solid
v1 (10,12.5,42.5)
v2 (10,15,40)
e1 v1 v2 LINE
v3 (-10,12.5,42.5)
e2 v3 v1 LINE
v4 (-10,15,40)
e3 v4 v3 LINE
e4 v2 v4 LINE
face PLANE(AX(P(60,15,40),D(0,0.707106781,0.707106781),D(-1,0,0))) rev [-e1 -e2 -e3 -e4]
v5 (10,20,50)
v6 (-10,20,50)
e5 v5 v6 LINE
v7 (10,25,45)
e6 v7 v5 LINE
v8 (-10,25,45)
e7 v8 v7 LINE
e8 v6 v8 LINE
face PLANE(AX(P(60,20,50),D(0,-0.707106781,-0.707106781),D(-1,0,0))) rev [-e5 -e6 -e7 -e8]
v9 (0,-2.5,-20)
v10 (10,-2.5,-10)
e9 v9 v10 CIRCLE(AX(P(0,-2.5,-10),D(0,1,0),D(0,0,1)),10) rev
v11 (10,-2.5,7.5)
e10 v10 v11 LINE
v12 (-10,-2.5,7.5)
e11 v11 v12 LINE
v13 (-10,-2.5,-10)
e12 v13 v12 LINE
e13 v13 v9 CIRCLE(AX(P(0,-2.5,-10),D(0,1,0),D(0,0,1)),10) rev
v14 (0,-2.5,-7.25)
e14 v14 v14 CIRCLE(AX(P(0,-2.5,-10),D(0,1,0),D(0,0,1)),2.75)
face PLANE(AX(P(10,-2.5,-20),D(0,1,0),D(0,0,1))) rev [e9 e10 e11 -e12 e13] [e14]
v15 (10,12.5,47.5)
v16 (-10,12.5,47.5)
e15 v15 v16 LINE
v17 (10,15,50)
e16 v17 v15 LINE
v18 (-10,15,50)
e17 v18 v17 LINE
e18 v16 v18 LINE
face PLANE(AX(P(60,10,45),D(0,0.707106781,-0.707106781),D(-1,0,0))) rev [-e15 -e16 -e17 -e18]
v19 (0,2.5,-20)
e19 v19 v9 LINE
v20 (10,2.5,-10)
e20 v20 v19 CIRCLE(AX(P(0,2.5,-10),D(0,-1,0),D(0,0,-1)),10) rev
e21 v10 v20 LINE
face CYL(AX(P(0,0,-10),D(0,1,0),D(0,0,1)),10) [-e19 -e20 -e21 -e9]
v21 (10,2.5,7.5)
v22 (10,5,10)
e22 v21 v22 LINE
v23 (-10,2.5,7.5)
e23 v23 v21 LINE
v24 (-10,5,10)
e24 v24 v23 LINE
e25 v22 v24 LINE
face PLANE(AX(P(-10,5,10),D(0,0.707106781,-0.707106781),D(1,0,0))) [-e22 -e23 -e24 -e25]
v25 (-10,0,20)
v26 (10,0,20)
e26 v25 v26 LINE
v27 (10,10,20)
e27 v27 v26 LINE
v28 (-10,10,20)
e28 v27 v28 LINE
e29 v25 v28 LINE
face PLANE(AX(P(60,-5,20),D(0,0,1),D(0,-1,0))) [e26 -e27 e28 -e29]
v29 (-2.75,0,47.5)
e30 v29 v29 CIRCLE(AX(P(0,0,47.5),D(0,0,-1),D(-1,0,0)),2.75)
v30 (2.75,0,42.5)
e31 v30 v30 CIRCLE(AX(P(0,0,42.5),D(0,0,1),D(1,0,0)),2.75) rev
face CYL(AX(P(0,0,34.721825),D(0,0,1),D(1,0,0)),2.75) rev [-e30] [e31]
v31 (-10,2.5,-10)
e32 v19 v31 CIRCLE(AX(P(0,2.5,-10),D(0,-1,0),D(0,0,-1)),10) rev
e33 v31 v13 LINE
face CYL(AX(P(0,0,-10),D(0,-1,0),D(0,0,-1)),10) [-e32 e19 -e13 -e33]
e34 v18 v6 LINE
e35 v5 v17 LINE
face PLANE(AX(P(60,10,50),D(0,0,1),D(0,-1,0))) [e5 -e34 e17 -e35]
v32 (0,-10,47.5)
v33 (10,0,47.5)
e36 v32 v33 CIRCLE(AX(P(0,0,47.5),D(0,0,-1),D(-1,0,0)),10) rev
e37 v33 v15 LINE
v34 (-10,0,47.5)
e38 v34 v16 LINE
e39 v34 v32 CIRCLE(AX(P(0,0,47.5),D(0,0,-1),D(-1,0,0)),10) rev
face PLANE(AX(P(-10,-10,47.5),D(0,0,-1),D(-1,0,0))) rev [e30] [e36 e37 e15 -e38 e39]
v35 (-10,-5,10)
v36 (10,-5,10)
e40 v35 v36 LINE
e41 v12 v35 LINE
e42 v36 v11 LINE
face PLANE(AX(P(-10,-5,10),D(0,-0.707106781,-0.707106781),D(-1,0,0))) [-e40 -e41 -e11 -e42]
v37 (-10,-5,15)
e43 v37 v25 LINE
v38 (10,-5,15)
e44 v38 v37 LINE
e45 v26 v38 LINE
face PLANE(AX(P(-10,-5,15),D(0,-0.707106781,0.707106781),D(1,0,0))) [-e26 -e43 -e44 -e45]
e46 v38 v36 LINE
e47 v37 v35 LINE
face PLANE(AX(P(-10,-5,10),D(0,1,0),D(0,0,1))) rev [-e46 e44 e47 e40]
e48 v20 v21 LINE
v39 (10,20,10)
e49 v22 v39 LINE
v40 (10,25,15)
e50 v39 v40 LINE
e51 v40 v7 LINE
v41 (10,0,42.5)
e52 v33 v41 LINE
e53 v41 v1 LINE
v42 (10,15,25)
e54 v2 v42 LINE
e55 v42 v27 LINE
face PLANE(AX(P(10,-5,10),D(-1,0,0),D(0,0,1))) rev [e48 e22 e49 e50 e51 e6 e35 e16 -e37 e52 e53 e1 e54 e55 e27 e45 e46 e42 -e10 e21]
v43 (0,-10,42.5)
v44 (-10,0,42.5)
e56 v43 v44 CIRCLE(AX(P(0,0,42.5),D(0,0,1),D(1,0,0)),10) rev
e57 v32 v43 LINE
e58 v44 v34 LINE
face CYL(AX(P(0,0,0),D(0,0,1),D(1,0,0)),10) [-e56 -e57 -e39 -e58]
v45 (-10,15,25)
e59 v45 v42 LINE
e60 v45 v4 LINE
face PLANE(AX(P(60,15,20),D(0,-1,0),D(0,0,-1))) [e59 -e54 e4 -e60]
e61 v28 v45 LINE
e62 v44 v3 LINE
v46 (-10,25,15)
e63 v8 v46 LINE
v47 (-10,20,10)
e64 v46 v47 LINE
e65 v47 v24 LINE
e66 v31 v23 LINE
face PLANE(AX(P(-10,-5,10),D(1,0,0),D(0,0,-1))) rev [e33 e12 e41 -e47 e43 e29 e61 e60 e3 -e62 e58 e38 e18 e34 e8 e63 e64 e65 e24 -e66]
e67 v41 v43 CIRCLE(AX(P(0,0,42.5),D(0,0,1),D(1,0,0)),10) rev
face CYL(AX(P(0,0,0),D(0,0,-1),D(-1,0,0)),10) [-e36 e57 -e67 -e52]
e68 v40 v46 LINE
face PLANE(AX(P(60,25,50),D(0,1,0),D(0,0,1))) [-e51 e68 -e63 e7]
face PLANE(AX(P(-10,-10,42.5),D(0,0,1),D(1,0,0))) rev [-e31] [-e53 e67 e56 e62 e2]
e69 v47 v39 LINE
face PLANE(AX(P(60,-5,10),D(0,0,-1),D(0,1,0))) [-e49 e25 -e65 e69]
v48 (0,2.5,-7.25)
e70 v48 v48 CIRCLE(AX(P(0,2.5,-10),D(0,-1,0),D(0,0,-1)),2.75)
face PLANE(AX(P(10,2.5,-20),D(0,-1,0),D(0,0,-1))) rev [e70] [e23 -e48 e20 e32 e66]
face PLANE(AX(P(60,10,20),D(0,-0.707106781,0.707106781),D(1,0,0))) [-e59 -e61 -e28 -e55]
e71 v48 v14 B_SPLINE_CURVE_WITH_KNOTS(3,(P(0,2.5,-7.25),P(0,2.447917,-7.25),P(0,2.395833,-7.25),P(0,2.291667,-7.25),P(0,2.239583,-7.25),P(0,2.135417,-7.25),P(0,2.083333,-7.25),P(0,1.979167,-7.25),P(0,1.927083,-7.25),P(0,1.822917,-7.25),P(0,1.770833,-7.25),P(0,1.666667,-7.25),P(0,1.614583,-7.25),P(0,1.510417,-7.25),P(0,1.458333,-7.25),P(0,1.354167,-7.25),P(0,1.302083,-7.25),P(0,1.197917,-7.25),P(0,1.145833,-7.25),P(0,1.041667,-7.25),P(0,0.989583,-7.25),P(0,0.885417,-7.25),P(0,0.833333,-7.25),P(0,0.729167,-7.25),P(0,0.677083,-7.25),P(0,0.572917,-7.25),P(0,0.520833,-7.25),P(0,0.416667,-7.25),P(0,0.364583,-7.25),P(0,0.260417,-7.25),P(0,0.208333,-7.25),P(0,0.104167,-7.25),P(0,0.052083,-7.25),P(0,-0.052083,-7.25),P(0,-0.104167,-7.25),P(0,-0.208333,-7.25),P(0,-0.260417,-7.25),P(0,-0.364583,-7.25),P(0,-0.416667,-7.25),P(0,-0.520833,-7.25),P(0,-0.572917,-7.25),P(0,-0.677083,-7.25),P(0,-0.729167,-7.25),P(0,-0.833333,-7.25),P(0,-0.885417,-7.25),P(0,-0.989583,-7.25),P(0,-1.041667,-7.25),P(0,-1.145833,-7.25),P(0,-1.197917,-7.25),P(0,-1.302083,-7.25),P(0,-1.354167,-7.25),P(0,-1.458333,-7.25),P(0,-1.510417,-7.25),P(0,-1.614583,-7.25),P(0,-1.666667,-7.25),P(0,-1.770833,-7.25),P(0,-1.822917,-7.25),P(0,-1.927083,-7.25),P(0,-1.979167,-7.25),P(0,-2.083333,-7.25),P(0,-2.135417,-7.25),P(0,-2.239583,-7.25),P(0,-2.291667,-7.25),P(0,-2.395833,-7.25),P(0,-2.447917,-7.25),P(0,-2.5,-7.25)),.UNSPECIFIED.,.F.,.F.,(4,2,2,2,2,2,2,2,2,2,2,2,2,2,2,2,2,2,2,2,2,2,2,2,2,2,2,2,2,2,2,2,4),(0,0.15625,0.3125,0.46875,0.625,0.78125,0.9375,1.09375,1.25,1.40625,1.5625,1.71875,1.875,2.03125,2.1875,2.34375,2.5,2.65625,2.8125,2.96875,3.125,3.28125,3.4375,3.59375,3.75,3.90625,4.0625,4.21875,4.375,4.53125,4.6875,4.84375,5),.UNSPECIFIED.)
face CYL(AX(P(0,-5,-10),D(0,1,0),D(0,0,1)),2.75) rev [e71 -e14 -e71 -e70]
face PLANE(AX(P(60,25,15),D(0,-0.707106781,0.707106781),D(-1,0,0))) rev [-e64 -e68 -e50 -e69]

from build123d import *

# Parameters (mm, degrees)
SKETCH1_W               = 20
SKETCH1_H               = 10
BOSS_EXTRUDE1_DEPTH     = 10
SKETCH3_W               = 20
SKETCH3_H               = 5
BOSS_EXTRUDE2_DEPTH     = 20
FILLET1_R               = 10
BOSS_EXTRUDE3_DEPTH     = 20
CUT_EXTRUDE1_DEPTH      = 56.733742024
CUT_EXTRUDE1_DEPTH_BACK = 56.733742024
SKETCH5_R               = 2.75
CHAMFER1_SIZE           = 10
SKETCH6_W               = 20
SKETCH6_H               = 5
BOSS_EXTRUDE4_DEPTH     = 20
FILLET2_R               = 10
CUT_EXTRUDE2_DEPTH      = 73.672209269
CUT_EXTRUDE2_DEPTH_BACK = 5
SKETCH7_R               = 2.75
CHAMFER2_SIZE           = 5
CHAMFER3_SIZE           = 5


# Some blends are built 0.0001 mm under size
with BuildPart() as part:
    # Sketch1 → Boss-Extrude1 (new body)
    with BuildSketch(Plane.XY):
        Rectangle(SKETCH1_W, SKETCH1_H)
    extrude(amount=BOSS_EXTRUDE1_DEPTH)

    # Sketch3 → Boss-Extrude2 (add)
    with BuildSketch(Plane(origin=(0, 0, 0), x_dir=(-1, 0, 0), z_dir=(0, 0, -1))):
        Rectangle(SKETCH3_W, SKETCH3_H)
    extrude(amount=BOSS_EXTRUDE2_DEPTH)

    # Fillet1
    fillet1_edges = [part.edges().sort_by_distance(p)[0] for p in [
        (-10, 0, -20),
        (10, 0, -20),
    ]]
    fillet(fillet1_edges, radius=FILLET1_R - 0.0001)  # a hair under: the kernel refuses the full size

    # Sketch4 → Boss-Extrude3 (add)
    with BuildSketch(Plane.ZY.offset(10)):
        Polygon((20, -5), (20, 15), (40, 15), (40, 10), (50, 10), (50, 25), (10, 25), (10, -5), align=None)
    extrude(amount=-BOSS_EXTRUDE3_DEPTH)

    # Sketch5 → Cut-Extrude1 (cut, two sides: drawn at the far end of the back side and taken through both)
    with BuildSketch(Plane(origin=(0, 2.5, 0), x_dir=(1, 0, 0), z_dir=(0, 1, 0)).offset(-CUT_EXTRUDE1_DEPTH_BACK)):
        with Locations(Location((0, 10, 0), (0, 0, 270))):
            Circle(SKETCH5_R)
    extrude(amount=CUT_EXTRUDE1_DEPTH + CUT_EXTRUDE1_DEPTH_BACK, mode=Mode.SUBTRACT)

    # Chamfer1
    # the kernel refuses this chamfer: 10 mm, written as the material it takes off along each edge
    with BuildSketch(Plane(origin=(35.71682988, 5, 0), x_dir=(0, -0.9996219169112968, -0.027495876610586372), z_dir=(-1, 0, 0))) as chamfer1_piece_1_section:
        Polygon((CHAMFER1_SIZE * 0.999621916911, CHAMFER1_SIZE * 0.0274958766106), (-CHAMFER1_SIZE * 0.0274958766106, CHAMFER1_SIZE * 0.999621916911), (0, 0), align=None)
    chamfer1_piece_1 = extrude(amount=71.433659759, mode=Mode.PRIVATE)
    chamfer1_piece_1 = split(chamfer1_piece_1, bisect_by=Plane(origin=(0, -2.5, 0.578931494), z_dir=(0, -1, 0)), keep=Keep.TOP, mode=Mode.PRIVATE)
    add(chamfer1_piece_1, mode=Mode.SUBTRACT)
    with BuildSketch(Plane(origin=(35.71682988, 5, 0), x_dir=(0, -0.9996219169112968, -0.027495876610586372), z_dir=(-1, 0, 0))) as chamfer1_piece_2_section:
        Polygon((CHAMFER1_SIZE * 0.999621916911, CHAMFER1_SIZE * 0.0274958766106), (-CHAMFER1_SIZE * 0.0274958766106, CHAMFER1_SIZE * 0.999621916911), (0, 0), align=None)
    chamfer1_piece_2 = extrude(amount=71.433659759, mode=Mode.PRIVATE)
    chamfer1_piece_2 = split(chamfer1_piece_2, bisect_by=Plane(origin=(0, 2.5, 4.466280687), z_dir=(0, 1, 0)), keep=Keep.TOP, mode=Mode.PRIVATE)
    chamfer1_piece_2 = split(chamfer1_piece_2, bisect_by=Plane(origin=(0, 3.939233337, 10), z_dir=(0, 0, -1)), keep=Keep.TOP, mode=Mode.PRIVATE)
    add(chamfer1_piece_2, mode=Mode.SUBTRACT)
    with BuildSketch(Plane(origin=(-35.71682988, -5, 0), x_dir=(0, -0.027495876610586403, 0.9996219169112968), z_dir=(1, 0, 0))) as chamfer1_piece_3_section:
        Polygon((CHAMFER1_SIZE * 0.999621916911, -CHAMFER1_SIZE * 0.0274958766106), (-CHAMFER1_SIZE * 0.0274958766106, -CHAMFER1_SIZE * 0.999621916911), (0, 0), align=None)
    chamfer1_piece_3 = extrude(amount=71.433659759, mode=Mode.PRIVATE)
    chamfer1_piece_3 = split(chamfer1_piece_3, bisect_by=Plane(origin=(0, -2.5, 4.487529346), z_dir=(0, -1, 0)), keep=Keep.TOP, mode=Mode.PRIVATE)
    add(chamfer1_piece_3, mode=Mode.SUBTRACT)
    with BuildSketch(Plane(origin=(-35.71682988, -5, 0), x_dir=(0, -0.027495876610586403, 0.9996219169112968), z_dir=(1, 0, 0))) as chamfer1_piece_4_section:
        Polygon((CHAMFER1_SIZE * 0.999621916911, -CHAMFER1_SIZE * 0.0274958766106), (-CHAMFER1_SIZE * 0.0274958766106, -CHAMFER1_SIZE * 0.999621916911), (0, 0), align=None)
    chamfer1_piece_4 = extrude(amount=71.433659759, mode=Mode.PRIVATE)
    chamfer1_piece_4 = split(chamfer1_piece_4, bisect_by=Plane(origin=(0, 2.5, 0.578931494), z_dir=(0, 1, 0)), keep=Keep.TOP, mode=Mode.PRIVATE)
    add(chamfer1_piece_4, mode=Mode.SUBTRACT)

    # Sketch6 → Boss-Extrude4 (add)
    with BuildSketch(Plane.XZ.offset(-10)):
        with Locations((0, 45)):
            Rectangle(SKETCH6_W, SKETCH6_H)
    extrude(amount=BOSS_EXTRUDE4_DEPTH)

    # Fillet2
    fillet2_edges = [part.edges().sort_by_distance(p)[0] for p in [
        (10, -10, 45),
        (-10, -10, 45),
    ]]
    fillet(fillet2_edges, radius=FILLET2_R - 0.0001)  # a hair under: the kernel refuses the full size

    # Sketch7 → Cut-Extrude2 (cut, two sides: drawn at the far end of the back side and taken through both)
    with BuildSketch(Plane.XY.offset(47.5).offset(-CUT_EXTRUDE2_DEPTH_BACK)):
        Circle(SKETCH7_R)
    extrude(amount=CUT_EXTRUDE2_DEPTH + CUT_EXTRUDE2_DEPTH_BACK, mode=Mode.SUBTRACT)

    # Chamfer2
    # the kernel refuses this chamfer: 5 mm, written as the material it takes off along each edge
    with BuildSketch(Plane(origin=(-22.85841494, 10, 40), x_dir=(0, -0.027495876610586317, 0.9996219169112968), z_dir=(1, 0, 0))) as chamfer2_piece_1_section:
        Polygon((CHAMFER2_SIZE * 0.999621916911, -CHAMFER2_SIZE * 0.0274958766106), (-CHAMFER2_SIZE * 0.0274958766106, -CHAMFER2_SIZE * 0.999621916911), (0, 0), align=None)
    chamfer2_piece_1 = extrude(amount=45.71682988, mode=Mode.PRIVATE)
    chamfer2_piece_1 = split(chamfer2_piece_1, bisect_by=Plane(origin=(0, 11.959930185, 42.5), z_dir=(0, 0, -1)), keep=Keep.TOP, mode=Mode.PRIVATE)
    chamfer2_piece_1 = split(chamfer2_piece_1, bisect_by=Plane(origin=(0, 15, 41.043890797), z_dir=(0, -1, 0)), keep=Keep.TOP, mode=Mode.PRIVATE)
    add(chamfer2_piece_1, mode=Mode.SUBTRACT)
    with BuildSketch(Plane(origin=(-22.85841494, 10, 50), x_dir=(0, -0.027495876610586317, -0.9996219169112968), z_dir=(1, 0, 0))) as chamfer2_piece_2_section:
        Polygon((CHAMFER2_SIZE * 0.999621916911, CHAMFER2_SIZE * 0.0274958766106), (-CHAMFER2_SIZE * 0.0274958766106, CHAMFER2_SIZE * 0.999621916911), (0, 0), align=None)
    chamfer2_piece_2 = extrude(amount=45.71682988, mode=Mode.PRIVATE)
    chamfer2_piece_2 = split(chamfer2_piece_2, bisect_by=Plane(origin=(0, 11.967005421, 47.5), z_dir=(0, 0, 1)), keep=Keep.TOP, mode=Mode.PRIVATE)
    add(chamfer2_piece_2, mode=Mode.SUBTRACT)

    # Chamfer3
    chamfer3_edges = [part.edges().sort_by_distance(p)[0] for p in [
        (0, 25, 10),
        (0, 25, 50),
        (0, 15, 20),
        (0, -5, 20),
    ]]
    chamfer(chamfer3_edges, length=CHAMFER3_SIZE)


solid = part.part
